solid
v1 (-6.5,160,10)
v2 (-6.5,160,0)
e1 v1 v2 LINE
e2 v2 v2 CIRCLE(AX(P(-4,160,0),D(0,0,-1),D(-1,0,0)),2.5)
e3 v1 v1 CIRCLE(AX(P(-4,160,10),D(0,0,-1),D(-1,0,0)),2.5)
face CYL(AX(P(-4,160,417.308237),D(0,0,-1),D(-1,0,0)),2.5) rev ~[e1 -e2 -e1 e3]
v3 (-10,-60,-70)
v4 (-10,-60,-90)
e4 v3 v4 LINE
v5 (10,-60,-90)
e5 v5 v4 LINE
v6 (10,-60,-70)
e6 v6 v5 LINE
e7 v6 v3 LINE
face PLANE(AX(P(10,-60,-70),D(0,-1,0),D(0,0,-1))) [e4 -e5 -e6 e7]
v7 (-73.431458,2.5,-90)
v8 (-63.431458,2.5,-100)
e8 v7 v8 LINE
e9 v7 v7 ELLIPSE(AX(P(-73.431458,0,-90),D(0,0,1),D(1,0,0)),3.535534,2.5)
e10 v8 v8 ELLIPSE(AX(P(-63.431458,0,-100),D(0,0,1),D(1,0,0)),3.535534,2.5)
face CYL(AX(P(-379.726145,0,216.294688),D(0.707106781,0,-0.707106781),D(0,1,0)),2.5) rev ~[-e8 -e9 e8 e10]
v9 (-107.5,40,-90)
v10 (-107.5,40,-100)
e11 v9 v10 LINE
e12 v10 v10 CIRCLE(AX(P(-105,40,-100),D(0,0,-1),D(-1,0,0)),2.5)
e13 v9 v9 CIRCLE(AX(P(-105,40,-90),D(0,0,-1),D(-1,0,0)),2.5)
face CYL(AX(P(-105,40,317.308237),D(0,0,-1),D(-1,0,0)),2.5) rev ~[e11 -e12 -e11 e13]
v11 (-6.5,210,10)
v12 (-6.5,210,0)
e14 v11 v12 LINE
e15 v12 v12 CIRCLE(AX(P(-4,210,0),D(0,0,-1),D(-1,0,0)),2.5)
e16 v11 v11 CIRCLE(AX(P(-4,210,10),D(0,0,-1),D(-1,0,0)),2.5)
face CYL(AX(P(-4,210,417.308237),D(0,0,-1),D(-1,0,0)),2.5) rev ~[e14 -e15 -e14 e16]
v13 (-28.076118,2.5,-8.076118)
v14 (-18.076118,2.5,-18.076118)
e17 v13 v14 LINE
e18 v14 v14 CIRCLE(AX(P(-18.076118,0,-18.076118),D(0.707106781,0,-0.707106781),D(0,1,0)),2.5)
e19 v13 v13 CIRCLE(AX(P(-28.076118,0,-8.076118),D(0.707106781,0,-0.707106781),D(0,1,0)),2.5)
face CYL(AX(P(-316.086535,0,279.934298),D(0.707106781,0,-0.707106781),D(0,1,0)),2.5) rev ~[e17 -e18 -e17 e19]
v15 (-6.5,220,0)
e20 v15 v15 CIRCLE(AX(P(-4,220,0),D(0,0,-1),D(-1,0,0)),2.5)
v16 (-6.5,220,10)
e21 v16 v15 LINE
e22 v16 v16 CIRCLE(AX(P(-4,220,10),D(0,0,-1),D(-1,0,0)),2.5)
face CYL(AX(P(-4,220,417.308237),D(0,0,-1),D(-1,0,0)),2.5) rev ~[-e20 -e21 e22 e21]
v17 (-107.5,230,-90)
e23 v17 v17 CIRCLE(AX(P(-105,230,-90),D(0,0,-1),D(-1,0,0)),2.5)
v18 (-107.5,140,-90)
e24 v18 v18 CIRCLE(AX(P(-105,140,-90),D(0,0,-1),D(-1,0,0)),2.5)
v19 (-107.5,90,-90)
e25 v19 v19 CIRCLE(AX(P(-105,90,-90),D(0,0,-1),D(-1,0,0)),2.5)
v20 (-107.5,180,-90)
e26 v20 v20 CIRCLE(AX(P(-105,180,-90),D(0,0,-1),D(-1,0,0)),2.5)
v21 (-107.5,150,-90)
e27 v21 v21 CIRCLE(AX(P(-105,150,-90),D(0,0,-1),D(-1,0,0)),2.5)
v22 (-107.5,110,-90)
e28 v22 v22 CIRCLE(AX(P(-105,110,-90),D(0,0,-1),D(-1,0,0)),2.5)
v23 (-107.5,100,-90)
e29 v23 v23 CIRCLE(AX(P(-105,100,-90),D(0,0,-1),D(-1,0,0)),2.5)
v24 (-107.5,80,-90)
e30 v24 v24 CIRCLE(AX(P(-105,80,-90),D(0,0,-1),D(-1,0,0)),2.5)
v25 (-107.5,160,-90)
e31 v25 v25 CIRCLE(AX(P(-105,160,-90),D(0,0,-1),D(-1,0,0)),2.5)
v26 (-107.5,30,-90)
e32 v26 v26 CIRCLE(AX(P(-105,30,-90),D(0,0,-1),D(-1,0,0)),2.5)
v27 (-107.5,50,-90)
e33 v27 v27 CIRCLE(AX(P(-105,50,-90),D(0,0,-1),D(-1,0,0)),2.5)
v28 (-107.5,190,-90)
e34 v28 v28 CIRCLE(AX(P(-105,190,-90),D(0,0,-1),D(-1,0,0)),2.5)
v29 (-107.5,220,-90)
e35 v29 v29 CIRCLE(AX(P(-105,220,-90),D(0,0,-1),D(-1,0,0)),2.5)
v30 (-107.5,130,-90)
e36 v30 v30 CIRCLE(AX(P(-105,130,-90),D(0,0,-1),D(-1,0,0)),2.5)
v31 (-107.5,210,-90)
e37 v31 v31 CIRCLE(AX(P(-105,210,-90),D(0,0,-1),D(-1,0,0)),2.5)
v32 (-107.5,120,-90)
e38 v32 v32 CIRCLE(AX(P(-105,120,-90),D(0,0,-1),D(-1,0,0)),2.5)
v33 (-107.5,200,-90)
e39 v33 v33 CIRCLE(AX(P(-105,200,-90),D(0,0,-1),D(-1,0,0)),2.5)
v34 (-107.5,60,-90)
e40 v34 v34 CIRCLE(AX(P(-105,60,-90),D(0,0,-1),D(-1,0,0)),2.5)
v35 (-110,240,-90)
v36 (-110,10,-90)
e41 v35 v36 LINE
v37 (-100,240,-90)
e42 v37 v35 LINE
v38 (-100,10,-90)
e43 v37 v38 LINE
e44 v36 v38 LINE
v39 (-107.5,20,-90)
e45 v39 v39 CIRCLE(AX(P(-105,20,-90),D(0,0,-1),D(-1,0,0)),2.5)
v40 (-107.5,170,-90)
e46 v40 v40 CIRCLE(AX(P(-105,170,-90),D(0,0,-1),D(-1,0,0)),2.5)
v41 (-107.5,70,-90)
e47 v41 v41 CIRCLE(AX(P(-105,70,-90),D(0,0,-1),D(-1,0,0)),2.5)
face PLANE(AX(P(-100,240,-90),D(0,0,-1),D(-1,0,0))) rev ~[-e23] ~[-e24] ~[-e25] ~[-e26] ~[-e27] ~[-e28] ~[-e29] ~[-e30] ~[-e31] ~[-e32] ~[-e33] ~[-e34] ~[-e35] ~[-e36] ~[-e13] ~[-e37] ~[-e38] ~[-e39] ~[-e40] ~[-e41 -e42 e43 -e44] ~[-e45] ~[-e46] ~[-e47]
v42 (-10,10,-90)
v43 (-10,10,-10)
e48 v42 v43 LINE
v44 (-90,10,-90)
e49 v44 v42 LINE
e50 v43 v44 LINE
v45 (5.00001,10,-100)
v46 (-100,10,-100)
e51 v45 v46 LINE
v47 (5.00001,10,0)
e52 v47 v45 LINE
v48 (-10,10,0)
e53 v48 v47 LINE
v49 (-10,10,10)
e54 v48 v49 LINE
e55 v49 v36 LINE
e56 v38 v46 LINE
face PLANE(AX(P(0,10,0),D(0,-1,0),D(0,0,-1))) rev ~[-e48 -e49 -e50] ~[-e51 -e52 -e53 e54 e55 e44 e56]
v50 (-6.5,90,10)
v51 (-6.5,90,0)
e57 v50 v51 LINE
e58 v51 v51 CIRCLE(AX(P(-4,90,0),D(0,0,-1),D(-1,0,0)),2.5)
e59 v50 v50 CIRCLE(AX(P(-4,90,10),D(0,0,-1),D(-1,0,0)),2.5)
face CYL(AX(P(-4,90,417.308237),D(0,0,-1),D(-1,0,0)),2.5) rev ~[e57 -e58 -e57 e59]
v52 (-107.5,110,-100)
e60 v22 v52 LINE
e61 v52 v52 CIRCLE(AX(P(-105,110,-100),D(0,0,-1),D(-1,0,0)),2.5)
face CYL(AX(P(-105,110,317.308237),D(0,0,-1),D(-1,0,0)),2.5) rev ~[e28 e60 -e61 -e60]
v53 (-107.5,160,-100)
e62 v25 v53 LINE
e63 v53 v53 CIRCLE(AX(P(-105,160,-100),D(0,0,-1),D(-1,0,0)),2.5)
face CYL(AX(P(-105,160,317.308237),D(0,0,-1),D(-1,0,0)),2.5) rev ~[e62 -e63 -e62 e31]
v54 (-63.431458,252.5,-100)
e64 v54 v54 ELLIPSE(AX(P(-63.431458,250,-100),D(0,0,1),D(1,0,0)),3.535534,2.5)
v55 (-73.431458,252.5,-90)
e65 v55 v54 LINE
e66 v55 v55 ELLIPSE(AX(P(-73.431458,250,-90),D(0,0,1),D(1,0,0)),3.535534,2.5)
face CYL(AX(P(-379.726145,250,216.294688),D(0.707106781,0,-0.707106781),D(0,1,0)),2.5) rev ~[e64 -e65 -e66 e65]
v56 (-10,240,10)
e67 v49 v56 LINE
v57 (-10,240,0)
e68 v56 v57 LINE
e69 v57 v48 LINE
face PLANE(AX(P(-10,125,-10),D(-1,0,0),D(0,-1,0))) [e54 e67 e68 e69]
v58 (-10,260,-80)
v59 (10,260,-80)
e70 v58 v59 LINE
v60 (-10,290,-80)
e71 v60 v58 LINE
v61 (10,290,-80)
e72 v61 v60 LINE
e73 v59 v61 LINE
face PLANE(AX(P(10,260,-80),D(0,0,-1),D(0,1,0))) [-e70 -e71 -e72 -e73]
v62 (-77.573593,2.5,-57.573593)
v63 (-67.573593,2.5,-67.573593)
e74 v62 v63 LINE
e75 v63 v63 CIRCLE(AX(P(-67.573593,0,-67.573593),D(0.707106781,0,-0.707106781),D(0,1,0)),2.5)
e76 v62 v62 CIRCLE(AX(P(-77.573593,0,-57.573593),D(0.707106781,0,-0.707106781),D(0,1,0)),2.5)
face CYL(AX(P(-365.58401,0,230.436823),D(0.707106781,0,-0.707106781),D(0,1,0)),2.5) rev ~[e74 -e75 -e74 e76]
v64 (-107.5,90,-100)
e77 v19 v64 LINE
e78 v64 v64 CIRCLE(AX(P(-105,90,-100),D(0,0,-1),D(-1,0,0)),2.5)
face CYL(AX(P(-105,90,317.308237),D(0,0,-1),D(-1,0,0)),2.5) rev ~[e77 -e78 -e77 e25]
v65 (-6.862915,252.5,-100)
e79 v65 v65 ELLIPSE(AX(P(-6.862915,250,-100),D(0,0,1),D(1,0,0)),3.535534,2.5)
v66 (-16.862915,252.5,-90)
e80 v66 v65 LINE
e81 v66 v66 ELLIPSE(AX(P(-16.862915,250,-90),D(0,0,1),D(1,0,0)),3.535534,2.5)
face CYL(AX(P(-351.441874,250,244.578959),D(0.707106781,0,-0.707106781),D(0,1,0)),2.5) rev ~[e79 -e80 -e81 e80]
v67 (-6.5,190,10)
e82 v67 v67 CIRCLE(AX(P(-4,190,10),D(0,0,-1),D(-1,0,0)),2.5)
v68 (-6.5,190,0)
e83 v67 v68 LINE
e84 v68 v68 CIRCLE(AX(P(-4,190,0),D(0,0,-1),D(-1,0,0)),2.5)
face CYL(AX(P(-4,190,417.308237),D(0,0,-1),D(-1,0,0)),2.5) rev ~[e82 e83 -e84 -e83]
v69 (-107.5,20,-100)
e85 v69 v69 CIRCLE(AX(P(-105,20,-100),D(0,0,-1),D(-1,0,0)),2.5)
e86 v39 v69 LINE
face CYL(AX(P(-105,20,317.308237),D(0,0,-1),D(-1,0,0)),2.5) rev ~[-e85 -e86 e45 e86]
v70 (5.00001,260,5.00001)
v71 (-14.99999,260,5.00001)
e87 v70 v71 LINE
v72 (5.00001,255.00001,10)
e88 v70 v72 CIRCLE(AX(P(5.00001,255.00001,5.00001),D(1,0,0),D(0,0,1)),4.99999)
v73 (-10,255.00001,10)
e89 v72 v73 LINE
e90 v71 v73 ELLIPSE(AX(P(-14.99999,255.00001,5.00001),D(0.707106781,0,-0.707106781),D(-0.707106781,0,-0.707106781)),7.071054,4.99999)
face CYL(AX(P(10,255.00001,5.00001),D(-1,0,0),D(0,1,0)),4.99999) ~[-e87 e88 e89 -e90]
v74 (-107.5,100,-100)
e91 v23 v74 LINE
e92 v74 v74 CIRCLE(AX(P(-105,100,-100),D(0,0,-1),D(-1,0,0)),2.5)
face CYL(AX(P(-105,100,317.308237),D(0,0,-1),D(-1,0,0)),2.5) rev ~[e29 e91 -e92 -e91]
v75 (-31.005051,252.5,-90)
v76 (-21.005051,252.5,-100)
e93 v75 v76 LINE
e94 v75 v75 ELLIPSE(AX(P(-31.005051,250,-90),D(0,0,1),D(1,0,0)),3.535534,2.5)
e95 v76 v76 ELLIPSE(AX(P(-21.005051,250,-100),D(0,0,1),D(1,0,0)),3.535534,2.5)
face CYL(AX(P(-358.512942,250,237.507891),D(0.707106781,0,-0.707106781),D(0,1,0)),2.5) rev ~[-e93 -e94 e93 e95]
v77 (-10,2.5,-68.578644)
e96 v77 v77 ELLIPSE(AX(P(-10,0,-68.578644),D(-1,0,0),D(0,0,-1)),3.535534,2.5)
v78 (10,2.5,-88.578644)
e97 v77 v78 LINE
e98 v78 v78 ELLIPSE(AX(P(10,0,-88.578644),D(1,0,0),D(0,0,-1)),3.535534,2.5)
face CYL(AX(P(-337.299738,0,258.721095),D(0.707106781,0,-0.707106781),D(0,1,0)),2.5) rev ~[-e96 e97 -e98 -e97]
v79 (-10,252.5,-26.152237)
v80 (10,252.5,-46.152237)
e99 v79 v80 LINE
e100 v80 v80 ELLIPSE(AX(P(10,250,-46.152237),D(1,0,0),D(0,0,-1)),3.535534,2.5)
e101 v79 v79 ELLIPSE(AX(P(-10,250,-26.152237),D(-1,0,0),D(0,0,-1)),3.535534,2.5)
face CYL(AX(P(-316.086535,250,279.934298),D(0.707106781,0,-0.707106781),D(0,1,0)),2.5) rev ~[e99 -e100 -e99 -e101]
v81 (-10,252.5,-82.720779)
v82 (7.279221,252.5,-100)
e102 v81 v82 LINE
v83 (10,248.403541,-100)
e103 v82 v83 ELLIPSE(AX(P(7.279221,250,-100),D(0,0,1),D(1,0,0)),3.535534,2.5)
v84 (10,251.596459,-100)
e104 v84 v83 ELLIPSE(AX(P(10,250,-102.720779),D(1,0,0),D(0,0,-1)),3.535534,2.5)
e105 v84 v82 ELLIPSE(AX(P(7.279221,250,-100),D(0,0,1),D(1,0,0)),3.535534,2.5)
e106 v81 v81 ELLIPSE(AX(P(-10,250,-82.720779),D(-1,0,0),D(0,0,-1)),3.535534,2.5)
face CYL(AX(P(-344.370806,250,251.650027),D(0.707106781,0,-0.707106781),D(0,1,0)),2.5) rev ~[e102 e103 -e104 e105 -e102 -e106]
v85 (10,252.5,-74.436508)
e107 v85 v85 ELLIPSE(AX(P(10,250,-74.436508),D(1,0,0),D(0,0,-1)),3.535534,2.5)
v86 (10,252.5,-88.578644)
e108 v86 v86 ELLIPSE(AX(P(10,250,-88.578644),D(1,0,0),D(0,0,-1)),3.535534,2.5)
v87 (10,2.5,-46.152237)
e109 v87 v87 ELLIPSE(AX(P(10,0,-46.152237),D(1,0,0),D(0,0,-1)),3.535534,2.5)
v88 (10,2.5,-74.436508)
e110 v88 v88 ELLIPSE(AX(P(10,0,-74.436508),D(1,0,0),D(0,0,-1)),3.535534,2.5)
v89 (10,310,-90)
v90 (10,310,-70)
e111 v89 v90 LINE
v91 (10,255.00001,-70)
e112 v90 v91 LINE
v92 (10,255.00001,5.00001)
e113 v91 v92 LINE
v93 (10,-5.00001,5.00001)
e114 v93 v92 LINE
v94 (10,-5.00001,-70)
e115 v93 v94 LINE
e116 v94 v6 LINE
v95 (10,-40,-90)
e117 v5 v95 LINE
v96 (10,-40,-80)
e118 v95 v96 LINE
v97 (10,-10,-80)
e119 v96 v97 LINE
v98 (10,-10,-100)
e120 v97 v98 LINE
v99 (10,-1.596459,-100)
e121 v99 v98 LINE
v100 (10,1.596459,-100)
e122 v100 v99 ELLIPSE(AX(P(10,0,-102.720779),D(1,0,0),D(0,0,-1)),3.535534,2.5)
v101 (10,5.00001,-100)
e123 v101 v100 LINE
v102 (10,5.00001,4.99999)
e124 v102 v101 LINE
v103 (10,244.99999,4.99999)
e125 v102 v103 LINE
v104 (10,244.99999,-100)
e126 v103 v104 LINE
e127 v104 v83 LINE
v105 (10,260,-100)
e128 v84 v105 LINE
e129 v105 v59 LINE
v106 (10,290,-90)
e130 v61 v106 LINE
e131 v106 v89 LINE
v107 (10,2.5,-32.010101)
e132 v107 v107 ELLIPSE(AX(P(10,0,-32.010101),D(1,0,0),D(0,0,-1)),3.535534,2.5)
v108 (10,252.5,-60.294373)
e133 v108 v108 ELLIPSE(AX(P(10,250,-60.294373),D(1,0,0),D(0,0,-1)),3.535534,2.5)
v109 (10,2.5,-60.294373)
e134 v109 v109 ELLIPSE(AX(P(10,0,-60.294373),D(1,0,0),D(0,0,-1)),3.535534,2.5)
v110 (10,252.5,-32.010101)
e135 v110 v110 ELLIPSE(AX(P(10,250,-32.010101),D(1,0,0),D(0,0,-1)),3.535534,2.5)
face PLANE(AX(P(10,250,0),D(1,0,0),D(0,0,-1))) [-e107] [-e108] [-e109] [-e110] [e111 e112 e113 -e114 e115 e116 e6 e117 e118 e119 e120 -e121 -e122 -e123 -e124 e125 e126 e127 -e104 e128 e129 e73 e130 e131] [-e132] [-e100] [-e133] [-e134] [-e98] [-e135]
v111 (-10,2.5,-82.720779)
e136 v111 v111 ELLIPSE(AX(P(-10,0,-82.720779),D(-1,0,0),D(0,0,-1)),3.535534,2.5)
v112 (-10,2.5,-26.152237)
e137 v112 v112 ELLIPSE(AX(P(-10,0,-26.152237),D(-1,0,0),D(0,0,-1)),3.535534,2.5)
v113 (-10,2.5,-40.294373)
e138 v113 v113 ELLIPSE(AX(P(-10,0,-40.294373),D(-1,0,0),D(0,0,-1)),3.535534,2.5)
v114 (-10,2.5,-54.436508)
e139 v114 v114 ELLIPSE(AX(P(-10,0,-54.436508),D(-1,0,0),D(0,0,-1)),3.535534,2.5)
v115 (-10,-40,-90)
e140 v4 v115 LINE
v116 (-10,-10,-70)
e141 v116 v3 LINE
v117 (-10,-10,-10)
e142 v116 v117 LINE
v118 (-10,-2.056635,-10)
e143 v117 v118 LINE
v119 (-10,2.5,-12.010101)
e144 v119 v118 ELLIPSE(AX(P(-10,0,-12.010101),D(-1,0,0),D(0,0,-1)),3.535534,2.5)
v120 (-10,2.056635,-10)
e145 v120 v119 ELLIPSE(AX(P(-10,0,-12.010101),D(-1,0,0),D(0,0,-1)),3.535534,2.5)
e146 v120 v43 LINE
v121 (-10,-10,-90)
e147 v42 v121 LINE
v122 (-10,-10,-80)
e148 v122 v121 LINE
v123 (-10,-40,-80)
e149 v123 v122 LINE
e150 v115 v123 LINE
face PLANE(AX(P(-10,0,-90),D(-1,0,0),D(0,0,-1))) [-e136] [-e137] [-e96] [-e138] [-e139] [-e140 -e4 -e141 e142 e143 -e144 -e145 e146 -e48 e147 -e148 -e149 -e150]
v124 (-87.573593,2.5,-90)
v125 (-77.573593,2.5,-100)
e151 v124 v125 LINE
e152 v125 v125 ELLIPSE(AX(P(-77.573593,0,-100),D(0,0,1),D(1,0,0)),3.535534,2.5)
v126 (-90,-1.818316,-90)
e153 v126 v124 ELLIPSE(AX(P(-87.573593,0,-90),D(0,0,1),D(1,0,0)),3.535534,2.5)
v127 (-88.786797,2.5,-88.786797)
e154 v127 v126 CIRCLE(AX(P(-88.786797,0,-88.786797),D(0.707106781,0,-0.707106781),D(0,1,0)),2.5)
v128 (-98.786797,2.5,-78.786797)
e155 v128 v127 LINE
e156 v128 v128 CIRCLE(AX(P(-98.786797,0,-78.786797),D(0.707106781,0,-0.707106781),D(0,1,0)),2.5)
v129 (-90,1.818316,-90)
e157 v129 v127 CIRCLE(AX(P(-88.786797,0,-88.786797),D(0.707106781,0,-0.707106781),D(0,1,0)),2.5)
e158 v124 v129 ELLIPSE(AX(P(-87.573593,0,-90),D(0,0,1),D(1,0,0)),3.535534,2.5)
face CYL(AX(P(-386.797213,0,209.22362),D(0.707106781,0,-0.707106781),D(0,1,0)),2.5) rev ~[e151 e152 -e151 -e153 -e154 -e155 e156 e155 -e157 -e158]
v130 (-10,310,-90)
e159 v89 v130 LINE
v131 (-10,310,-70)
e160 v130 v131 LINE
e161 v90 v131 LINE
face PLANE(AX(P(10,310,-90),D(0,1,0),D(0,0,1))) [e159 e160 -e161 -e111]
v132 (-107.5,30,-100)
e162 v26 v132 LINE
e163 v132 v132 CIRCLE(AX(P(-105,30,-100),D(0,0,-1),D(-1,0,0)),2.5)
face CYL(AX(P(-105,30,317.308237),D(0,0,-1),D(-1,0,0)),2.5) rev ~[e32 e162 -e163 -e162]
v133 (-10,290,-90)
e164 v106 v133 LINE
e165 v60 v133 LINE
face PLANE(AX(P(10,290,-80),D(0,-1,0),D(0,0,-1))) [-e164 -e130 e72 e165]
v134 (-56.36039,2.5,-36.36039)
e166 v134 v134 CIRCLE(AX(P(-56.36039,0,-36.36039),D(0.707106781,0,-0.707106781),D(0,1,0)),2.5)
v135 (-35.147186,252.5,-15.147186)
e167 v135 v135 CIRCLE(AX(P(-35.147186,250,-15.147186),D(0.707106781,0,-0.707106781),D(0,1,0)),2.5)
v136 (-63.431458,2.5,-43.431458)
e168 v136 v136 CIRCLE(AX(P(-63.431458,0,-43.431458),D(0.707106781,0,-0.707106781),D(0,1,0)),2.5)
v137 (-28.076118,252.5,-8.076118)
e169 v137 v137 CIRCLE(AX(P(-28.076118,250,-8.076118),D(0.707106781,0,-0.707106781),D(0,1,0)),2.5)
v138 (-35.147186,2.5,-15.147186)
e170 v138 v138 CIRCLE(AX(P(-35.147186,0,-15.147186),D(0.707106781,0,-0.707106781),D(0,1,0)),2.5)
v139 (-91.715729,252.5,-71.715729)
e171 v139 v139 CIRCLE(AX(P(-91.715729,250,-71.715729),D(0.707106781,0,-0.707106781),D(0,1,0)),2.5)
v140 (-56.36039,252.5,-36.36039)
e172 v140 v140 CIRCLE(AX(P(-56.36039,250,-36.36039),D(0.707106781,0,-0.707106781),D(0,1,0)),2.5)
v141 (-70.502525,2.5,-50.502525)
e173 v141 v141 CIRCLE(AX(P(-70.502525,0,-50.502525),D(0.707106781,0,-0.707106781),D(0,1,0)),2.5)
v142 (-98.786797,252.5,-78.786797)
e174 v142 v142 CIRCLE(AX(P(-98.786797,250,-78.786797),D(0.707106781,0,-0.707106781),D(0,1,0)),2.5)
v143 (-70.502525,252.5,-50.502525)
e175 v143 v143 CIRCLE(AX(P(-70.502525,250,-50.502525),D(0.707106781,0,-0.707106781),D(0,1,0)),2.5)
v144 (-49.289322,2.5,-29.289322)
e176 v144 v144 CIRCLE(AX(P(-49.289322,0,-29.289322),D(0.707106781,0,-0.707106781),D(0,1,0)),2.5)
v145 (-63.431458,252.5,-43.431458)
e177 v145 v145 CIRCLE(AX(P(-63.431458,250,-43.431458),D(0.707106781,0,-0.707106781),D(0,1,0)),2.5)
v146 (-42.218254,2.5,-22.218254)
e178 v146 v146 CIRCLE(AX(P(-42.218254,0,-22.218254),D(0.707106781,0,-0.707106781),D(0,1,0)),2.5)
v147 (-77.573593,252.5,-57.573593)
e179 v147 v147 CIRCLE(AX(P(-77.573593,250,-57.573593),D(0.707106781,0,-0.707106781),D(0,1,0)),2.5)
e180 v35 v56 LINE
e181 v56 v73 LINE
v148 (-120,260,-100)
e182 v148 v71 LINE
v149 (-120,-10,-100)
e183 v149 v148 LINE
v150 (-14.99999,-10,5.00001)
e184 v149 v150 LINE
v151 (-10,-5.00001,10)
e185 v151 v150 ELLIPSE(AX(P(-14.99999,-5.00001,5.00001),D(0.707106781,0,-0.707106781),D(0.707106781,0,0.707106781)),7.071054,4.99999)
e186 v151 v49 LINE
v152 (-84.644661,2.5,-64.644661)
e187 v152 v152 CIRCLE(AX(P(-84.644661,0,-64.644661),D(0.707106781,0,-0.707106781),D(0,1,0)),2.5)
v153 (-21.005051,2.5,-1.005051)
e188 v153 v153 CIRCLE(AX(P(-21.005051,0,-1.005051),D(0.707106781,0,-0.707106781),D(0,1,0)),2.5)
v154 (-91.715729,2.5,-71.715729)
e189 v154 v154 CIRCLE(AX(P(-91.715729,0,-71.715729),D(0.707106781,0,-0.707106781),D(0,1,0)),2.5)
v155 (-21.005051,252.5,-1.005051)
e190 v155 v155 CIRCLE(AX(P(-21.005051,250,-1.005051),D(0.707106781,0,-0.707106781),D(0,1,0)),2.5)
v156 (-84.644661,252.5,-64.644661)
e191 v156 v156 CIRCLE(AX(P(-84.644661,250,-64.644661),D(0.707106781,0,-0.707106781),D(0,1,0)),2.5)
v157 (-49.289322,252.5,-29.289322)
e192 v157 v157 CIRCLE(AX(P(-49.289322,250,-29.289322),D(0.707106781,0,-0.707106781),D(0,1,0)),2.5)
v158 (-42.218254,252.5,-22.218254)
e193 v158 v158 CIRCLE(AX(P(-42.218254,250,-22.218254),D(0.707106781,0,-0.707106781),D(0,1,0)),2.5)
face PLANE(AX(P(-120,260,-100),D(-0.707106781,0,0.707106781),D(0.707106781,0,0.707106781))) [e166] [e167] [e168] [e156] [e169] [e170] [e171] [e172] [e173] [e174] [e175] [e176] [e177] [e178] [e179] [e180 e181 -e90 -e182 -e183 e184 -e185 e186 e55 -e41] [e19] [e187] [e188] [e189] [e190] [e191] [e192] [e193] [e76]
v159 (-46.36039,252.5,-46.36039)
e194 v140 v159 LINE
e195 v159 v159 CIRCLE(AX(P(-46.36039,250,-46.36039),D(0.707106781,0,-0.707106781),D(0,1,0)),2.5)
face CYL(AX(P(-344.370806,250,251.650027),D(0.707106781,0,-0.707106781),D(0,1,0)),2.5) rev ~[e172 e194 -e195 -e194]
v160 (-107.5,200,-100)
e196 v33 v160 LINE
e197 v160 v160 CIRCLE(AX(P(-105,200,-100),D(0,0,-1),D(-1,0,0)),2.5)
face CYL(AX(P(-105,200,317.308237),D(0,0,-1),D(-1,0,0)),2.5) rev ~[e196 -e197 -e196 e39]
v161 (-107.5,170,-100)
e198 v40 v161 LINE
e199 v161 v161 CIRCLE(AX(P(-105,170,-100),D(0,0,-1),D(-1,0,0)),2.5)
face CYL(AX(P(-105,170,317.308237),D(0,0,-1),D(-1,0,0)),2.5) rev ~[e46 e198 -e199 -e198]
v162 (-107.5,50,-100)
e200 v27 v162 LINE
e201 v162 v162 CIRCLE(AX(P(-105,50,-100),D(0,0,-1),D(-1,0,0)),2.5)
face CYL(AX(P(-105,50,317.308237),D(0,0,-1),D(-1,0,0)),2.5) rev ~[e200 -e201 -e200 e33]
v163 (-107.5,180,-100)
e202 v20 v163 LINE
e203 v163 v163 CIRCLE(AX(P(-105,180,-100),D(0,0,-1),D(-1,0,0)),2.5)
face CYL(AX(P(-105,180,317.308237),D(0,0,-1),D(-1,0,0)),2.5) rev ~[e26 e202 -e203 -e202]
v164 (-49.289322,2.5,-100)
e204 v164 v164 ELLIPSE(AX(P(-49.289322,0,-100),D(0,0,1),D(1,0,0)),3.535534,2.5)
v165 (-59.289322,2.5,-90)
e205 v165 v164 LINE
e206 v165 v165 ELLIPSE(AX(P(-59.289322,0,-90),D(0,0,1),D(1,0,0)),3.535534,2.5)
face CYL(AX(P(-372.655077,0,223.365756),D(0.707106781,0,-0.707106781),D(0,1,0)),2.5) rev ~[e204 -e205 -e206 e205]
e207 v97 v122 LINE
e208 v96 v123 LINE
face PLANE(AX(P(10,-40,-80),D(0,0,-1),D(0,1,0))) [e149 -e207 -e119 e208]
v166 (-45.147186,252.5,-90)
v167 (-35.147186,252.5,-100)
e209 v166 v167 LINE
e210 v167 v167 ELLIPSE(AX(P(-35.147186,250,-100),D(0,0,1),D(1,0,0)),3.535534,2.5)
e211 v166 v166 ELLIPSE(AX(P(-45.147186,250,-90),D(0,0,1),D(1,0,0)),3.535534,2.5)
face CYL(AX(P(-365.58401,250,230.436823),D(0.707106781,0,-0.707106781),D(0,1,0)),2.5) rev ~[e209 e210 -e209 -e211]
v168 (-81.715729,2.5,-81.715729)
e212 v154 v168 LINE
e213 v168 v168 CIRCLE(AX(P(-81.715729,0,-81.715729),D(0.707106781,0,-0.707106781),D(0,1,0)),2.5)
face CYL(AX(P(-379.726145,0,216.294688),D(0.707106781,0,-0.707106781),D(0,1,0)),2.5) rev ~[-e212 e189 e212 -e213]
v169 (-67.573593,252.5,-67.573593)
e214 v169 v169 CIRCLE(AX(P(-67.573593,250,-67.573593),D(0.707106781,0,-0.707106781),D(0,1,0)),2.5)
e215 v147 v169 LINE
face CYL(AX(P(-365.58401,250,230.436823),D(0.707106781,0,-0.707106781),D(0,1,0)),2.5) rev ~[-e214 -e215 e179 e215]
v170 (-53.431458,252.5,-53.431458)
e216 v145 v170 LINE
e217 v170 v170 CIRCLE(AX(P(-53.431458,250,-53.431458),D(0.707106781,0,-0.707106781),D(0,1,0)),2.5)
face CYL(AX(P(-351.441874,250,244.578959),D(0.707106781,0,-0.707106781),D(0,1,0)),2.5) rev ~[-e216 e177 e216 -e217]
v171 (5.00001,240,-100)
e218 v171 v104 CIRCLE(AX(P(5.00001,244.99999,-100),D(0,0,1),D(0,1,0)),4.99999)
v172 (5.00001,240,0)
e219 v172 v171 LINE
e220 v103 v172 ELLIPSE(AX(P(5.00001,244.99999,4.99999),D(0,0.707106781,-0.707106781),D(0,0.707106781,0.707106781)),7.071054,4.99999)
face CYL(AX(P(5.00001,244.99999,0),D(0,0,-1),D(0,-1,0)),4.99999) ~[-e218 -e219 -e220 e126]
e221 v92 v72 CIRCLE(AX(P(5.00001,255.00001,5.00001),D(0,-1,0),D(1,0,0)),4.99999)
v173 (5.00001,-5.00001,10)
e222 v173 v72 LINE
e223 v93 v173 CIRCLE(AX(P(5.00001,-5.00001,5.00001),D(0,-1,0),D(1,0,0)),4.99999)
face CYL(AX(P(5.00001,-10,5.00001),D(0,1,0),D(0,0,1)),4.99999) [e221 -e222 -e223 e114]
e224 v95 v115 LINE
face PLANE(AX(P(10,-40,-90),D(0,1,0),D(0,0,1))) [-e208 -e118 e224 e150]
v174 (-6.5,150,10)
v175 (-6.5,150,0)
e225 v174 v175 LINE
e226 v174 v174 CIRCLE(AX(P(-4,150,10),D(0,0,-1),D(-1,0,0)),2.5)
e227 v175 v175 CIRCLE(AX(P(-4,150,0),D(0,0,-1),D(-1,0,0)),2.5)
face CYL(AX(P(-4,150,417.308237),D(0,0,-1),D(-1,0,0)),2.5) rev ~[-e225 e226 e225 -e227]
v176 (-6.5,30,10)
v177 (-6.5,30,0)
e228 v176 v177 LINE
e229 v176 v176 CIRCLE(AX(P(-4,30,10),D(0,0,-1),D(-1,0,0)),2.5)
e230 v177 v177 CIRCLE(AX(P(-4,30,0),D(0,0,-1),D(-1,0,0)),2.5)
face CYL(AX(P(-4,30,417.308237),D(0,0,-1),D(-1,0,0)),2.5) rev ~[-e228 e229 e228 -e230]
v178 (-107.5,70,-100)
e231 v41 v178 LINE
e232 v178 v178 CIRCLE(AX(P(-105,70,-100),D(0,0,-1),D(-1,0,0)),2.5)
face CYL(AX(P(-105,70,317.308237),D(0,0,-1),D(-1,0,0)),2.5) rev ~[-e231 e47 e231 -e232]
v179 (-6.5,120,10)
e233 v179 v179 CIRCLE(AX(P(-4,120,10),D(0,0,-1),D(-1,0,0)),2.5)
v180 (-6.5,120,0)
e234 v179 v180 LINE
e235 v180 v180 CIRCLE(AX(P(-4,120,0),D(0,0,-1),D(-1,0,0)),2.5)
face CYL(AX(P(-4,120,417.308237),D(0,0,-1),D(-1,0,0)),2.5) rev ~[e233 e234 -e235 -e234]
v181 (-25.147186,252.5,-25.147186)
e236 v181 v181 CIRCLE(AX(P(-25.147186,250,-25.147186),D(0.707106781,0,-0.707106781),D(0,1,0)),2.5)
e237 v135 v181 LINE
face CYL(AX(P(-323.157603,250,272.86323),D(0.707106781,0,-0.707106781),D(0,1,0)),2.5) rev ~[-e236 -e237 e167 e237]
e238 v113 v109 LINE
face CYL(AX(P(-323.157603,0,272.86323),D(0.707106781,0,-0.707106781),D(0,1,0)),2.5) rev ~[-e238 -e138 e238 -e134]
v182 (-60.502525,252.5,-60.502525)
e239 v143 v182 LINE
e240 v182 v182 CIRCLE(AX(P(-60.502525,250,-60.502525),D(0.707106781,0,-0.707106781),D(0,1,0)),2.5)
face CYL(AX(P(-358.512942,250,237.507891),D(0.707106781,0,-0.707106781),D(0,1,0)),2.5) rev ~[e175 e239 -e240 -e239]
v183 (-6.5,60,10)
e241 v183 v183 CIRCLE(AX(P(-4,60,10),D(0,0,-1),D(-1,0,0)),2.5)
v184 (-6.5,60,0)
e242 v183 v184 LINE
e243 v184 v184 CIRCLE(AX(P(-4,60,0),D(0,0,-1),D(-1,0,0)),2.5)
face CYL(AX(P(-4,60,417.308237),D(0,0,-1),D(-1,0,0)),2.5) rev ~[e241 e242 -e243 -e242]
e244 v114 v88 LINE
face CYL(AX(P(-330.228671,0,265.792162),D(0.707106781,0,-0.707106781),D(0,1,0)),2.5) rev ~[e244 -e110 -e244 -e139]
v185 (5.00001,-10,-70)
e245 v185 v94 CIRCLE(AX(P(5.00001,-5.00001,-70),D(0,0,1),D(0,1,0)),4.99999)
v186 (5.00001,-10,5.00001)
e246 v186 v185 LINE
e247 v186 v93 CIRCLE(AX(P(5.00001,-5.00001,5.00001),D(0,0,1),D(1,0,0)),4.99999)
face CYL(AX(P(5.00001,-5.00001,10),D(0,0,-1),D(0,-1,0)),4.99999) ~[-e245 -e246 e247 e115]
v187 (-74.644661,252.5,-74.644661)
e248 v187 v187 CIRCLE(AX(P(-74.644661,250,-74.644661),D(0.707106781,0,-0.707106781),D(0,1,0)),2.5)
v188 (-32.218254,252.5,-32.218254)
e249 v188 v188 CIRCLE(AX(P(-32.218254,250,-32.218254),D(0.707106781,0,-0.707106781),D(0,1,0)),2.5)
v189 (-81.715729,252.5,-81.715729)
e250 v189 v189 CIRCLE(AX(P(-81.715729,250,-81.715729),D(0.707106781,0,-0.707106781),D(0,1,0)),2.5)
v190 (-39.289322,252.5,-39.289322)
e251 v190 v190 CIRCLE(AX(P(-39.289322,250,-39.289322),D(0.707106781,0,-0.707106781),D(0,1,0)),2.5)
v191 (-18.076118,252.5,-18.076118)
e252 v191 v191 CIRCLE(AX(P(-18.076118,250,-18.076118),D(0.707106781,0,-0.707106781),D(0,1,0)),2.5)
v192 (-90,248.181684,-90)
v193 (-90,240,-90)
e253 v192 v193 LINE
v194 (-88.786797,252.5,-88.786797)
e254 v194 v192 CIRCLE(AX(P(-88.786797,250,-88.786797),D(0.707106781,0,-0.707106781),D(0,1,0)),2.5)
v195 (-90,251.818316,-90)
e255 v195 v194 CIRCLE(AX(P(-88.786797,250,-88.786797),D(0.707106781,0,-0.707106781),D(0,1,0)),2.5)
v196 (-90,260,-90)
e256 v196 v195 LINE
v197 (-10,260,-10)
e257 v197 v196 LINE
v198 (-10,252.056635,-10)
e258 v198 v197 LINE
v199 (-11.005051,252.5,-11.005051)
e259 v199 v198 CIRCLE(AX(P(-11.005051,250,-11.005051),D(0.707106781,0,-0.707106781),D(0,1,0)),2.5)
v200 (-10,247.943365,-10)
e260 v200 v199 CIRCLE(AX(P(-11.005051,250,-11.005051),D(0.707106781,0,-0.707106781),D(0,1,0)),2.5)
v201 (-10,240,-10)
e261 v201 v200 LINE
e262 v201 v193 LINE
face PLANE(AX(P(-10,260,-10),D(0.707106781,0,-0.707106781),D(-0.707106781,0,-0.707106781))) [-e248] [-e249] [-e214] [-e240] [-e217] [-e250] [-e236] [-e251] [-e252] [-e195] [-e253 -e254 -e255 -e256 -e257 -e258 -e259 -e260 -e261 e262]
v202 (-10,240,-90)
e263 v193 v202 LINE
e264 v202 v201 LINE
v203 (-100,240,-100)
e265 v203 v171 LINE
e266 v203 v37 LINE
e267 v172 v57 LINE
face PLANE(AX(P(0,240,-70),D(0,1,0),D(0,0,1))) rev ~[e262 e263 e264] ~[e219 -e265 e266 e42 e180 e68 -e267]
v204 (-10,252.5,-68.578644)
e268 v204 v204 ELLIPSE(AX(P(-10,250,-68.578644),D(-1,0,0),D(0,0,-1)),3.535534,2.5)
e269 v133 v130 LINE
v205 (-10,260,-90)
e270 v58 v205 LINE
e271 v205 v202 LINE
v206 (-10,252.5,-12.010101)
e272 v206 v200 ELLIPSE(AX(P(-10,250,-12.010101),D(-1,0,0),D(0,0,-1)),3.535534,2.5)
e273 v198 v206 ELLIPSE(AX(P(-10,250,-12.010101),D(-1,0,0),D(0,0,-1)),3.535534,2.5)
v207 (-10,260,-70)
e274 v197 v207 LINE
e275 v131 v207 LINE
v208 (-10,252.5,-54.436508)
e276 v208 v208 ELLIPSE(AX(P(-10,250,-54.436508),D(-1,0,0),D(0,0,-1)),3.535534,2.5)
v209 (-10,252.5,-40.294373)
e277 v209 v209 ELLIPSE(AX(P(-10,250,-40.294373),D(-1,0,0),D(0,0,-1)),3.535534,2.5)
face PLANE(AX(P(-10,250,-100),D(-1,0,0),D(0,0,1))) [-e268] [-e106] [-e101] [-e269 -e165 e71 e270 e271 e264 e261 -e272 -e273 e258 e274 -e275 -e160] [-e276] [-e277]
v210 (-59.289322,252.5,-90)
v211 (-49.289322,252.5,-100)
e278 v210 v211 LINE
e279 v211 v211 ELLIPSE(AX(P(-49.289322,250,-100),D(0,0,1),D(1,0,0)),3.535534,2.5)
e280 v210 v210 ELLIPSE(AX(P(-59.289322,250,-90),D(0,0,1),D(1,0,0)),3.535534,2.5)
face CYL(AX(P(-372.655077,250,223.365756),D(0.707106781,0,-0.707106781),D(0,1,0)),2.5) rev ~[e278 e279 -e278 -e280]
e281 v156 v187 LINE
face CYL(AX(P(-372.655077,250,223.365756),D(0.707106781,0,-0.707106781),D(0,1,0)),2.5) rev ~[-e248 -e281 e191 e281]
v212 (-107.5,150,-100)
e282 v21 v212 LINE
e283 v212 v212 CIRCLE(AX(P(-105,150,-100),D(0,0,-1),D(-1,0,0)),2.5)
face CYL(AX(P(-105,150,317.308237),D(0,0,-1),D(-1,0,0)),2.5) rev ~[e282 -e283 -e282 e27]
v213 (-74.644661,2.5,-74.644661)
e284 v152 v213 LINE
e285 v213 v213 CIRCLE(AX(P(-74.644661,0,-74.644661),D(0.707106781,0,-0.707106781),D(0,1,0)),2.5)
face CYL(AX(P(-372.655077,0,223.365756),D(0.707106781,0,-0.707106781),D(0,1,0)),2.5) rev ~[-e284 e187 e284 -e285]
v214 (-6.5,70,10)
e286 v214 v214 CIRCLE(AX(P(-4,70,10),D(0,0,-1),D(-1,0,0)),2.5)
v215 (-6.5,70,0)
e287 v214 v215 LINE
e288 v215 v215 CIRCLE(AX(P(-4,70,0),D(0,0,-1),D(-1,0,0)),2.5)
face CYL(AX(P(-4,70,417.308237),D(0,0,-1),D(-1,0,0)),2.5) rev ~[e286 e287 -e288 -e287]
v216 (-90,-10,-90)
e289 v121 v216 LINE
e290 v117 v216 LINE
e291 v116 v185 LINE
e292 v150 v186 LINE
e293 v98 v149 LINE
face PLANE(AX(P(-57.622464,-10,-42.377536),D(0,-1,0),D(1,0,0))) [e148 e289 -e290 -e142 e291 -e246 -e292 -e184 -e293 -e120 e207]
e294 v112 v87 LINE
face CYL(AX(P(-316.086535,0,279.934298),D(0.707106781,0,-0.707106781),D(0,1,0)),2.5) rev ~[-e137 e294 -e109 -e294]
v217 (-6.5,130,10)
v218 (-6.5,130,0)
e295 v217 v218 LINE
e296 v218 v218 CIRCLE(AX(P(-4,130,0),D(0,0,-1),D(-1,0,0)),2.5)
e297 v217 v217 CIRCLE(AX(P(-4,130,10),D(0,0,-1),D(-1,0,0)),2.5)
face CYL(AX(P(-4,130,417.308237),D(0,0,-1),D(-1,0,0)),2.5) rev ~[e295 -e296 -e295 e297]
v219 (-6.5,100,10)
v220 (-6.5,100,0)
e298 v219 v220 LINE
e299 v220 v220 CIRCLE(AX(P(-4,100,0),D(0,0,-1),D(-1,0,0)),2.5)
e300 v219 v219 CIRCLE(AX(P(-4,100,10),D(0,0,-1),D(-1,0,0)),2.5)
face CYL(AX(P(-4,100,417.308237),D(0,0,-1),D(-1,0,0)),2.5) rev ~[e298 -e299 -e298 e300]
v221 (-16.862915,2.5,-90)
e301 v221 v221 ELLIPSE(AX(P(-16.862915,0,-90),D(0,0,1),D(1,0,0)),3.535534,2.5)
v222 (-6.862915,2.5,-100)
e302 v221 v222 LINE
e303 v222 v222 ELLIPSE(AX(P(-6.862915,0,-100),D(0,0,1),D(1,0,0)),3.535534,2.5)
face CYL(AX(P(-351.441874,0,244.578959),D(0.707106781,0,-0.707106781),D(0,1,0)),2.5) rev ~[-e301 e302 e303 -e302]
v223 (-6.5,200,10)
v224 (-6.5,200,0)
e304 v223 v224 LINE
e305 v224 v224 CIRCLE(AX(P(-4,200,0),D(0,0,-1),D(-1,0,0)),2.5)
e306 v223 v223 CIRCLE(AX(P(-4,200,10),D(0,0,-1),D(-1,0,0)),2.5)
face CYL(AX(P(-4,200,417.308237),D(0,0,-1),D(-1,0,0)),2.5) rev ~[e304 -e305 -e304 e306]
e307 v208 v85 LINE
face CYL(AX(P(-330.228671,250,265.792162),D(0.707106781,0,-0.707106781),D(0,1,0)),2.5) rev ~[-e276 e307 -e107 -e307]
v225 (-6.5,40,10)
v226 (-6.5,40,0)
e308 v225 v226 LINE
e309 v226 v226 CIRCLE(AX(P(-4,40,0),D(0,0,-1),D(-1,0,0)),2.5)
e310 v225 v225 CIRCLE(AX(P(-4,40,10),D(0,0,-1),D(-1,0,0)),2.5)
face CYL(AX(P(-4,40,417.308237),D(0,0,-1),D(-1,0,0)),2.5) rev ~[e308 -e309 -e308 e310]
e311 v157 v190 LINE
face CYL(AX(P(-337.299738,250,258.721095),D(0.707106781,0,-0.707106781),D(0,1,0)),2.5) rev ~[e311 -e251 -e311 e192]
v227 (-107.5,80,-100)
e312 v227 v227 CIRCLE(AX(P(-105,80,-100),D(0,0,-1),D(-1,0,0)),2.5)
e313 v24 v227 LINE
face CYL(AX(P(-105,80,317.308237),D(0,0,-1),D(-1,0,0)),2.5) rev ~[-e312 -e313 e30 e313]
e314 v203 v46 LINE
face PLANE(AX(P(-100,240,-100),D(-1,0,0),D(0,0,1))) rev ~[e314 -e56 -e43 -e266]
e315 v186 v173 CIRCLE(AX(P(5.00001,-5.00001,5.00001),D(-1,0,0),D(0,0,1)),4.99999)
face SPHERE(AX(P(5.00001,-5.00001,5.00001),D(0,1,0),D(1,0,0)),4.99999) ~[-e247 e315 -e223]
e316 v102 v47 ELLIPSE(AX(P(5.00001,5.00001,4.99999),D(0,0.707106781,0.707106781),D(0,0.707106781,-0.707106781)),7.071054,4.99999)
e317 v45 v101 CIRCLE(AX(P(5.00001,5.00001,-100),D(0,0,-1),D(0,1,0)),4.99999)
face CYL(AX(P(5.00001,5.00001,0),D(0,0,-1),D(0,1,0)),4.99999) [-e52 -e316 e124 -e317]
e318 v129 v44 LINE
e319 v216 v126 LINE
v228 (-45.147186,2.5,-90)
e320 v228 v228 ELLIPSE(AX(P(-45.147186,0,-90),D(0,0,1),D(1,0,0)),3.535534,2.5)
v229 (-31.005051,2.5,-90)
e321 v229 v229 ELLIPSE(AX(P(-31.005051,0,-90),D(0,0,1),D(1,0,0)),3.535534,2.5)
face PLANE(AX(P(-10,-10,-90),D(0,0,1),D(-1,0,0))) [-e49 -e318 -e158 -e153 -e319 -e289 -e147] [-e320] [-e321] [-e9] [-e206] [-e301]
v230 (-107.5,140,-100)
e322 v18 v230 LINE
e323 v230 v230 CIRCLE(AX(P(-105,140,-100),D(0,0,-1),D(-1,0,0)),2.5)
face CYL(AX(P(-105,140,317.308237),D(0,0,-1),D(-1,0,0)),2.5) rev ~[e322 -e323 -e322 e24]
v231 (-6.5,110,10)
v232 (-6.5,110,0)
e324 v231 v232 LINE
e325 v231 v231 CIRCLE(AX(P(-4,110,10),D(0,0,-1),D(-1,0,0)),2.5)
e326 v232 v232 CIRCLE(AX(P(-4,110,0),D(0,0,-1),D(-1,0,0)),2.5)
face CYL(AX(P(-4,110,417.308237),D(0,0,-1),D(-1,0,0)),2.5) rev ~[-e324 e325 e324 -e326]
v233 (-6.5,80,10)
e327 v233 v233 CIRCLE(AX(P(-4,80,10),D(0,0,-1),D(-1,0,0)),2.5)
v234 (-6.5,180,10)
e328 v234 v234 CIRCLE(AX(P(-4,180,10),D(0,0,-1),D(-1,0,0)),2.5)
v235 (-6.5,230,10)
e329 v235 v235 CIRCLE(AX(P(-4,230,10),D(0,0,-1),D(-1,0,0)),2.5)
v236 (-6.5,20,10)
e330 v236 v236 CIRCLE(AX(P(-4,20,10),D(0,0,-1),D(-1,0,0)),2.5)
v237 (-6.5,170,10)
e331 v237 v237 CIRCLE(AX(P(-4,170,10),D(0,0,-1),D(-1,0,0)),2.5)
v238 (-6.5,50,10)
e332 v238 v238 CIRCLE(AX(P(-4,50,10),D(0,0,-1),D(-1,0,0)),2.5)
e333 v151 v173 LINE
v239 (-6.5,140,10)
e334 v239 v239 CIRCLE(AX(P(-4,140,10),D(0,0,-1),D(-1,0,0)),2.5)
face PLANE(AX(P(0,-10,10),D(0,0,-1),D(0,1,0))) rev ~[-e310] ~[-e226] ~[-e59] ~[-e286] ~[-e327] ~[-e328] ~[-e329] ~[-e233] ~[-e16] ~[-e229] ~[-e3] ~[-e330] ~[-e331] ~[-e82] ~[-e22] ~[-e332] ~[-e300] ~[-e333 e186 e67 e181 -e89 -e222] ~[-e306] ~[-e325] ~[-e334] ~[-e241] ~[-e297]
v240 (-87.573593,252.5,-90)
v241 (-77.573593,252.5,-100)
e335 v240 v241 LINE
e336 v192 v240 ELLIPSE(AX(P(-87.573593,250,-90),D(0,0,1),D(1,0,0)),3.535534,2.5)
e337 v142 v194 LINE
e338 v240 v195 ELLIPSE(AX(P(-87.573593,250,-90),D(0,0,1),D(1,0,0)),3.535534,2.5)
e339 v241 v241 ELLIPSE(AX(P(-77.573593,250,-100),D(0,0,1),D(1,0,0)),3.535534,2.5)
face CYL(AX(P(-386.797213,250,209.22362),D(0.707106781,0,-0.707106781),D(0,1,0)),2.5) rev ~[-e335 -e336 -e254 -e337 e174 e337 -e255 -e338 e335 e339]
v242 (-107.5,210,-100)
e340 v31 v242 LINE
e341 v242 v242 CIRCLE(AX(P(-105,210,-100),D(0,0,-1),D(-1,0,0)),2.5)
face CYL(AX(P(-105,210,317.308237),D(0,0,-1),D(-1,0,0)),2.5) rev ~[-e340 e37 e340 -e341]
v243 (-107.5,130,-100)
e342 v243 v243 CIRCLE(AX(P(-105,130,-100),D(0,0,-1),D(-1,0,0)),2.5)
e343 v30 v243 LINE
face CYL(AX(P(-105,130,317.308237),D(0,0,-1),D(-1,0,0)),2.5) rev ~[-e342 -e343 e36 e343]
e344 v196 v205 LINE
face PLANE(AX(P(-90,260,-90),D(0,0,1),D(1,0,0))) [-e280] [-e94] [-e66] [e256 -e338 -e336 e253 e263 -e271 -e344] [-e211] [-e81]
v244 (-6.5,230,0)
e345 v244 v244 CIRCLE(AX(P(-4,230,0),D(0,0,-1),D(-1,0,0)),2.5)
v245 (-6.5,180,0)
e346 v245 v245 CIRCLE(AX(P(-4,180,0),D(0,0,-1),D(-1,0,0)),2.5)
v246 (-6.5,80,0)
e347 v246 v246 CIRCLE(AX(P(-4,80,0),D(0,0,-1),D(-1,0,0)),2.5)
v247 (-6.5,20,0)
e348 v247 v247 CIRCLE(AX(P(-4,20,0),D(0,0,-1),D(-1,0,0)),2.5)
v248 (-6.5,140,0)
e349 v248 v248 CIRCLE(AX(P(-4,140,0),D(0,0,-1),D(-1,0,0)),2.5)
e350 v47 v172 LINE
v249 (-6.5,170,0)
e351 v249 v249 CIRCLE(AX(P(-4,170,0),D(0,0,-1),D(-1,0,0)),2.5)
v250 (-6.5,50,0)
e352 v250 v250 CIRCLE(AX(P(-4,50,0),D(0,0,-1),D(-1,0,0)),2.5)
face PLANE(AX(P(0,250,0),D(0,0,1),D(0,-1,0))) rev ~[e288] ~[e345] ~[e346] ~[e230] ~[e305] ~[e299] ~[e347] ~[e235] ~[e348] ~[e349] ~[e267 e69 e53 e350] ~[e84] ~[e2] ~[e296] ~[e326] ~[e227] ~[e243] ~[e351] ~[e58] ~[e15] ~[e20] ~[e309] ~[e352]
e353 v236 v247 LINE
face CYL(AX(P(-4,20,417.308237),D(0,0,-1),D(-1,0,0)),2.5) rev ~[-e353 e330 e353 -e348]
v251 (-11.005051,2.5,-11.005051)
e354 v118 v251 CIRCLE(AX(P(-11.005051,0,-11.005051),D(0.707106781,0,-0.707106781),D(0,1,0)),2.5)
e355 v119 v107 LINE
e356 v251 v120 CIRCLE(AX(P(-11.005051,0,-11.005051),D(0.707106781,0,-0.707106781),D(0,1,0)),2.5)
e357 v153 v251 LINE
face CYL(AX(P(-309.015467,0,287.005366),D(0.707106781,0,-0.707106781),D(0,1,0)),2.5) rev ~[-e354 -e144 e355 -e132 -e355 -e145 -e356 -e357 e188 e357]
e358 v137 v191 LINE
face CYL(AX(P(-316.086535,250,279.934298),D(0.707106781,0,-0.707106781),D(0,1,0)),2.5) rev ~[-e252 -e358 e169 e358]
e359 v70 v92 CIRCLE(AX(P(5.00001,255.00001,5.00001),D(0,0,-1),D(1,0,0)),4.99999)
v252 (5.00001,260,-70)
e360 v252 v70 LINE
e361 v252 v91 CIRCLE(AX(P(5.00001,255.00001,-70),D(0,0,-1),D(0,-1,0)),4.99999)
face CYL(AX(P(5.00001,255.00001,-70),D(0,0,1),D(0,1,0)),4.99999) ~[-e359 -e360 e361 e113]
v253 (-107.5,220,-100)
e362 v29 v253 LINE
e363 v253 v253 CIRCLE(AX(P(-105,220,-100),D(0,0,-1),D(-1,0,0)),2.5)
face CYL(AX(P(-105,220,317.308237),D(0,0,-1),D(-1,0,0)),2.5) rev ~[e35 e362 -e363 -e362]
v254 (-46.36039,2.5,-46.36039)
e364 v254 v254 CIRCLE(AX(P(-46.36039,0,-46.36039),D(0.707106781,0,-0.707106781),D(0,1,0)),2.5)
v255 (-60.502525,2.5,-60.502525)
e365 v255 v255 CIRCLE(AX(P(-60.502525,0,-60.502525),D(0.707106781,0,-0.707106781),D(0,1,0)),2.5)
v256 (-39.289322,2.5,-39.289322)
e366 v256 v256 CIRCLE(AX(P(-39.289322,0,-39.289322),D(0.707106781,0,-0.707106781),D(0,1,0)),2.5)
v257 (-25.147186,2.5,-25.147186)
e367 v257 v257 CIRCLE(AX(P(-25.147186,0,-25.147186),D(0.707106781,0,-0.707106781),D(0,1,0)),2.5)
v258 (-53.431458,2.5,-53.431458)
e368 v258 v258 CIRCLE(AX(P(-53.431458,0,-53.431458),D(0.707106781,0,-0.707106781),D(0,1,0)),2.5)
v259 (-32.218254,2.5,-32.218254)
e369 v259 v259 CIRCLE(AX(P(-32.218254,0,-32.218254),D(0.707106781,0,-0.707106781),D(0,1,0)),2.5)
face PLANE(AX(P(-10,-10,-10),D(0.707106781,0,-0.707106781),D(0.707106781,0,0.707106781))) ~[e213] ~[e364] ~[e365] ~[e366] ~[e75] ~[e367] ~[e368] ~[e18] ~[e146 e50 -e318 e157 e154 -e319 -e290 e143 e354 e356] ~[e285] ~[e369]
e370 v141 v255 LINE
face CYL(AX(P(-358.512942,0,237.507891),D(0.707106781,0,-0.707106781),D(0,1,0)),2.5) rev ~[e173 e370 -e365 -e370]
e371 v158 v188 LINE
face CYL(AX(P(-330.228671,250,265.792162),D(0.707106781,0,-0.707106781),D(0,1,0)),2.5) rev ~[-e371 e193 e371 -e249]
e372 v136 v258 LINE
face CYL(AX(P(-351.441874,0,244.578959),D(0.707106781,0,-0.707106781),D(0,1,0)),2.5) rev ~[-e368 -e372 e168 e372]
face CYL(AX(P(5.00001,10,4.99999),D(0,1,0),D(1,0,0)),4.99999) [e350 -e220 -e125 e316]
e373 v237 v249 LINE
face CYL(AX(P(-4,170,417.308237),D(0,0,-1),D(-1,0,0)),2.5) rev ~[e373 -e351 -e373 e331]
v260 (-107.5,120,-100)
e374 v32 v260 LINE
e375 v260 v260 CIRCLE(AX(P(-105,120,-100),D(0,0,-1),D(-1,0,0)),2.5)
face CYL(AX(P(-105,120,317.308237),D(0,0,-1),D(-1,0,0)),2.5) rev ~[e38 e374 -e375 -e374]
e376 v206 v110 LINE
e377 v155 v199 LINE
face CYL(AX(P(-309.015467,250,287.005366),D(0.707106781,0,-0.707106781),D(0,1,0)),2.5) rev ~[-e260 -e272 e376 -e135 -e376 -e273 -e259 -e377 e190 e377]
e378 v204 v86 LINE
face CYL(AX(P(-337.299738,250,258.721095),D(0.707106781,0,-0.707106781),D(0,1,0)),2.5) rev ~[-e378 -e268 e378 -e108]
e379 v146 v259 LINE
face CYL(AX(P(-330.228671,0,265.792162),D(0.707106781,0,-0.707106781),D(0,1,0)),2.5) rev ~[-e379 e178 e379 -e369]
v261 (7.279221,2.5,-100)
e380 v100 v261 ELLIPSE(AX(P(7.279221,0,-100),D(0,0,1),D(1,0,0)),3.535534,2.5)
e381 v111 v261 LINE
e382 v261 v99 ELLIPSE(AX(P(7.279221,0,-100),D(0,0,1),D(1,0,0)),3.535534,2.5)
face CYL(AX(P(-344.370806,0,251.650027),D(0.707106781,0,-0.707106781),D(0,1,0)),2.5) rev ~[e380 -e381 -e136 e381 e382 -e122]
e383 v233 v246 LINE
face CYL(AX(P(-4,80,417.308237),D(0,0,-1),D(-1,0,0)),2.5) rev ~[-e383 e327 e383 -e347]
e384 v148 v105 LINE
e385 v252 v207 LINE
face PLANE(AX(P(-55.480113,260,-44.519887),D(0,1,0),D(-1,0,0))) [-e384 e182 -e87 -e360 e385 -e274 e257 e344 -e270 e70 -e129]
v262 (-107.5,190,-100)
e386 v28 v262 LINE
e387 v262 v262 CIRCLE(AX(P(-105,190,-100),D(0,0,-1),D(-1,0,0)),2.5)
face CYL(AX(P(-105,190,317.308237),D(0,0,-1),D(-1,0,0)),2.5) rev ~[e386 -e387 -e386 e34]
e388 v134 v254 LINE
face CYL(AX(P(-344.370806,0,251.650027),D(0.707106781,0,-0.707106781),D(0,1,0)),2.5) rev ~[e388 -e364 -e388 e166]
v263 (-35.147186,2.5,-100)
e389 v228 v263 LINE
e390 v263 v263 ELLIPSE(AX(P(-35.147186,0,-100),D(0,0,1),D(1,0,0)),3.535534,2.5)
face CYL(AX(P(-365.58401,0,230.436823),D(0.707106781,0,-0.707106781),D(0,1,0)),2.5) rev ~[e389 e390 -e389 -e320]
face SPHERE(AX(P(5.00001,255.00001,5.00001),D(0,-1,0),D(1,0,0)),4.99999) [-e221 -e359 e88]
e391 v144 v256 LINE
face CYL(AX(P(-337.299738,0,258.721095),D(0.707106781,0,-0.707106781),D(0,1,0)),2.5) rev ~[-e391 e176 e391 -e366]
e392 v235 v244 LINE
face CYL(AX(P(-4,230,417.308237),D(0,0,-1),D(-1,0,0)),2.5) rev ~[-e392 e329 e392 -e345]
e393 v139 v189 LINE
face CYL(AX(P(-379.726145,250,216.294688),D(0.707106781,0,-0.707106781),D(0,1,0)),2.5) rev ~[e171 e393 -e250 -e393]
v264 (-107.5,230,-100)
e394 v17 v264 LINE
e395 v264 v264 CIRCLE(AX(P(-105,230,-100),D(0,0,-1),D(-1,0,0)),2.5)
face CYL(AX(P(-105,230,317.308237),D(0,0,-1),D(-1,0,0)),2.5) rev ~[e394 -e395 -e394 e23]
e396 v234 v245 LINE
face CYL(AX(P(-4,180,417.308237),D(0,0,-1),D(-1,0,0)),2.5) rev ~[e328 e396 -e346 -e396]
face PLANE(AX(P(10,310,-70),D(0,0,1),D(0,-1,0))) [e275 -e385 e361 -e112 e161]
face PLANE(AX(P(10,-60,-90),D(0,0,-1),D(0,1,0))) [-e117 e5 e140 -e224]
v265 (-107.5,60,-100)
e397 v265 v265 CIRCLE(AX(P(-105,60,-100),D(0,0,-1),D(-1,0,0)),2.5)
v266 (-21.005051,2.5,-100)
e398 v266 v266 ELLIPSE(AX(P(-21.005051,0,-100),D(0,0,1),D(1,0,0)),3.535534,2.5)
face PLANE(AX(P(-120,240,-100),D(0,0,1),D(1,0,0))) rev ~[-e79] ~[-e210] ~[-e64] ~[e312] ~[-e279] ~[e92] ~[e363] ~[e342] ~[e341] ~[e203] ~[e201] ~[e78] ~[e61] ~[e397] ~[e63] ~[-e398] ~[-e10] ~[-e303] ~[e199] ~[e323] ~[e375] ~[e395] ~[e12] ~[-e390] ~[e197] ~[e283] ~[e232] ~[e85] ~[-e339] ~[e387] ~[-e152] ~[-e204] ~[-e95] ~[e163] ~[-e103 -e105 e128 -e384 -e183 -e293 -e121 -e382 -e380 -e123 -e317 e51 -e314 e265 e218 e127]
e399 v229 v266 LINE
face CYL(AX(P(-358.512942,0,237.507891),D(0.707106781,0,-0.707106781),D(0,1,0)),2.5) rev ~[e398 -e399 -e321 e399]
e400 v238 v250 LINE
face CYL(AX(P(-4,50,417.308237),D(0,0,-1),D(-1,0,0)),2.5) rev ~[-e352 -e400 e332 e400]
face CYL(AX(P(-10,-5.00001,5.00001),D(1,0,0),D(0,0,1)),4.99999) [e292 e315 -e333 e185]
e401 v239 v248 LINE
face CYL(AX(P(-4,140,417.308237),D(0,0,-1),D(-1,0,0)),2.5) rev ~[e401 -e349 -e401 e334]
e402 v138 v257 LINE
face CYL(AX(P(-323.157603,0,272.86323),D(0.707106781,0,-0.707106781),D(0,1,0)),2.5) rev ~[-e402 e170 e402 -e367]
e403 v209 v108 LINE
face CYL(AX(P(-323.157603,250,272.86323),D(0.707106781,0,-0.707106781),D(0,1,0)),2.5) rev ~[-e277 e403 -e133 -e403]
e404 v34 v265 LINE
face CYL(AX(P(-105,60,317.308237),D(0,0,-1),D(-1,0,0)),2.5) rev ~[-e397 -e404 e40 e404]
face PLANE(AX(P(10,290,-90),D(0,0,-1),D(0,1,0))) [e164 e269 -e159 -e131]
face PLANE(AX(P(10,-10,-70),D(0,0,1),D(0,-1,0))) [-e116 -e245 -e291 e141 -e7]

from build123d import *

# Parameters (mm, degrees)
F1_DEPTH  = 10
F3_DEPTH  = 20
F4_W      = 10
F4_H      = 10
F5_DEPTH  = 20
F6_W      = 10
F6_H      = 10
F7_DEPTH  = 20
F8_W      = 10
F8_H      = 10
F9_DEPTH  = 20
F11_DEPTH = 10
F13_DEPTH = 20
F14_DEPTH = 20
F15_DEPTH = 10
F17_DEPTH = 20
F18_DEPTH = 10
F20_R     = 4.99999
F22_D     = 5
F23_DEPTH = 250
F25_D     = 5
F27_D     = 5


# Not quite as in the source:
# - a fillet or chamfer is up to 0.001 mm smaller than in the source, because OpenCascade refuses the exact size
# - a pattern or mirror of a feature is missing from the dataset's text; its kind, count and spacing are read off the source's solid


with BuildPart() as f1:
    # F0 (on Right) → F1 (new body)
    with BuildSketch(Plane.YZ):
        Polygon((0, -100), (0, 0), (250, 0), (250, -100), (260, -100), (260, 10), (-10, 10), (-10, -100), align=None)
    extrude(amount=F1_DEPTH)

    # F2 (on face) → F3 (join)
    with BuildSketch(Plane.YZ.offset(10)):
        Polygon((-40, -80), (-10, -80), (-10, -70), (-60, -70), (-60, -90), (-40, -90), align=None)
        Polygon((310, -70), (260, -70), (260, -80), (290, -80), (290, -90), (310, -90), align=None)
    extrude(amount=-F3_DEPTH)

    # F4 (on face) → F5 (join)
    with BuildSketch(Plane.YZ.offset(10)):
        with Locations((-5, -75)):
            Rectangle(F4_W, F4_H)
        with Locations((255, -75)):
            Rectangle(F4_W, F4_H)
    extrude(amount=-F5_DEPTH)

    # F6 (on face) → F7 (join)
    with BuildSketch(Plane(origin=(0, 0, -80), x_dir=(1, 0, 0), z_dir=(0, 0, -1))):
        with Locations((-5, -255)):
            Rectangle(F6_W, F6_H)
    extrude(amount=F7_DEPTH)

    # F8 (on face) → F9 (join)
    with BuildSketch(Plane(origin=(0, 0, -80), x_dir=(1, 0, 0), z_dir=(0, 0, -1))):
        with Locations((-5, 5)):
            Rectangle(F8_W, F8_H)
    extrude(amount=F9_DEPTH)

    # F10 (on face) → F11 (join)
    with BuildSketch(Plane(origin=(0, 0, 0), x_dir=(0, -1, 0), z_dir=(-1, 0, 0))):
        Polygon((10, 10), (-260, 10), (-260, -70), (-250, -70), (-250, 0), (0, 0), (0, -70), (10, -70), align=None)
    extrude(amount=F11_DEPTH)

    # F12 (on face) → F13 (join)
    with BuildSketch(Plane.XZ.offset(10)):
        Polygon((-10, 0), (-10, 10), (-110, -90), (-100, -90), align=None)
        Polygon((-10, -90), (-90, -90), (-100, -100), (-10, -100), align=None)
        Polygon((-100, -90), (-110, -90), (-110, -100), align=None)
        Polygon((-110, -100), (-110, -90), (-120, -100), align=None)
    extrude(amount=-F13_DEPTH)

    # F12 (on face) → F14 (join)
    with BuildSketch(Plane.XZ.offset(10)):
        Polygon((10, 10), (-10, 10), (-10, 0), (-10, -10), (-10, -70), (10, -70), align=None)
        Polygon((-90, -90), (-100, -90), (-110, -100), (-100, -100), align=None)
    extrude(amount=-F14_DEPTH)

    # F15 (add): a face of the model
    f15_faces = [f1.faces().sort_by_distance(p)[0] for p in [
        (0, 0, -85),
    ]]
    extrude(f15_faces, amount=F15_DEPTH)

    # F16 (on face) → F17 (join)
    with BuildSketch(Plane(origin=(0, 260, 0), x_dir=(-1, 0, 0), z_dir=(0, 1, 0))):
        Polygon((110, -90), (10, 10), (10, -10), (90, -90), align=None)
        Polygon((120, -100), (110, -90), (90, -90), (10, -90), (10, -100), align=None)
    f17 = extrude(amount=-F17_DEPTH)

    # F17_copies: F17 across plane
    add(f17.mirror(Plane(origin=(0, 125, 0), x_dir=(0, 0, -1), z_dir=(0, -1, 0))))

    # F18 (add): a face of the model
    f18_faces = [f1.faces().sort_by_distance(p)[0] for p in [
        (0, 250, -50),
    ]]
    extrude(f18_faces, amount=F18_DEPTH)

    # F20 (radius 5 in the source; OpenCascade refuses exactly that, so slightly less here)
    f20_edges = [f1.edges().sort_by_distance(p)[0] for p in [
        (10, 125, 10),
        (10, 125, 0),
        (10, 10, -50),
        (10, 240, -50),
        (10, -10, -30),
        (10, 260, -30),
        (0, 260, 10),
        (0, -10, 10),
    ]]
    fillet(f20_edges, radius=F20_R)

    # F22 (through all)
    with Locations(Plane.XY.offset(10)):
        with Locations((-4, 20), (-4, 30), (-4, 40), (-4, 50), (-4, 60), (-4, 70), (-4, 80), (-4, 90), (-4, 100), (-4, 110), (-4, 120), (-4, 130), (-4, 140), (-4, 150), (-4, 140), (-4, 160), (-4, 170), (-4, 180), (-4, 200), (-4, 210), (-4, 220), (-4, 230), (-4, 190)):
            Hole(F22_D / 2)

    # F19 (on face) → F23 (join)
    with BuildSketch(Plane.XZ.offset(-240)):
        Polygon((-100, -100), (-100, -90), (-110, -90), (-120, -100), align=None)
    extrude(amount=F23_DEPTH)

    # F25 (through all)
    with Locations(Plane.XY.offset(-90)):
        with Locations((-105, 20), (-105, 30), (-105, 40), (-105, 50), (-105, 60), (-105, 70), (-105, 80), (-105, 90), (-105, 100), (-105, 110), (-105, 120), (-105, 130), (-105, 140), (-105, 150), (-105, 160), (-105, 170), (-105, 180), (-105, 190), (-105, 200), (-105, 210), (-105, 220), (-105, 230)):
            Hole(F25_D / 2)

    # F27 (through all)
    with Locations(Plane(origin=(-10, 0, 10), x_dir=(0, -1, 0), z_dir=(-0.7071067812, 0, 0.7071067812))):
        with Locations((0, -15.563491861), (0, -25.563491861), (0, -35.563491861), (0, -45.563491861), (0, -55.563491861), (0, -65.563491861), (0, -75.563491861), (0, -85.563491861), (0, -95.563491861), (0, -105.563491861), (0, -115.563491861), (0, -125.563491861), (-250, -15.563491861), (-250, -25.563491861), (-250, -35.563491861), (-250, -45.563491861), (-250, -55.563491861), (-250, -65.563491861), (-250, -75.563491861), (-250, -85.563491861), (-250, -95.563491861), (-250, -105.563491861), (-250, -115.563491861), (-250, -125.563491861)):
            Hole(F27_D / 2)


solid = f1.part
